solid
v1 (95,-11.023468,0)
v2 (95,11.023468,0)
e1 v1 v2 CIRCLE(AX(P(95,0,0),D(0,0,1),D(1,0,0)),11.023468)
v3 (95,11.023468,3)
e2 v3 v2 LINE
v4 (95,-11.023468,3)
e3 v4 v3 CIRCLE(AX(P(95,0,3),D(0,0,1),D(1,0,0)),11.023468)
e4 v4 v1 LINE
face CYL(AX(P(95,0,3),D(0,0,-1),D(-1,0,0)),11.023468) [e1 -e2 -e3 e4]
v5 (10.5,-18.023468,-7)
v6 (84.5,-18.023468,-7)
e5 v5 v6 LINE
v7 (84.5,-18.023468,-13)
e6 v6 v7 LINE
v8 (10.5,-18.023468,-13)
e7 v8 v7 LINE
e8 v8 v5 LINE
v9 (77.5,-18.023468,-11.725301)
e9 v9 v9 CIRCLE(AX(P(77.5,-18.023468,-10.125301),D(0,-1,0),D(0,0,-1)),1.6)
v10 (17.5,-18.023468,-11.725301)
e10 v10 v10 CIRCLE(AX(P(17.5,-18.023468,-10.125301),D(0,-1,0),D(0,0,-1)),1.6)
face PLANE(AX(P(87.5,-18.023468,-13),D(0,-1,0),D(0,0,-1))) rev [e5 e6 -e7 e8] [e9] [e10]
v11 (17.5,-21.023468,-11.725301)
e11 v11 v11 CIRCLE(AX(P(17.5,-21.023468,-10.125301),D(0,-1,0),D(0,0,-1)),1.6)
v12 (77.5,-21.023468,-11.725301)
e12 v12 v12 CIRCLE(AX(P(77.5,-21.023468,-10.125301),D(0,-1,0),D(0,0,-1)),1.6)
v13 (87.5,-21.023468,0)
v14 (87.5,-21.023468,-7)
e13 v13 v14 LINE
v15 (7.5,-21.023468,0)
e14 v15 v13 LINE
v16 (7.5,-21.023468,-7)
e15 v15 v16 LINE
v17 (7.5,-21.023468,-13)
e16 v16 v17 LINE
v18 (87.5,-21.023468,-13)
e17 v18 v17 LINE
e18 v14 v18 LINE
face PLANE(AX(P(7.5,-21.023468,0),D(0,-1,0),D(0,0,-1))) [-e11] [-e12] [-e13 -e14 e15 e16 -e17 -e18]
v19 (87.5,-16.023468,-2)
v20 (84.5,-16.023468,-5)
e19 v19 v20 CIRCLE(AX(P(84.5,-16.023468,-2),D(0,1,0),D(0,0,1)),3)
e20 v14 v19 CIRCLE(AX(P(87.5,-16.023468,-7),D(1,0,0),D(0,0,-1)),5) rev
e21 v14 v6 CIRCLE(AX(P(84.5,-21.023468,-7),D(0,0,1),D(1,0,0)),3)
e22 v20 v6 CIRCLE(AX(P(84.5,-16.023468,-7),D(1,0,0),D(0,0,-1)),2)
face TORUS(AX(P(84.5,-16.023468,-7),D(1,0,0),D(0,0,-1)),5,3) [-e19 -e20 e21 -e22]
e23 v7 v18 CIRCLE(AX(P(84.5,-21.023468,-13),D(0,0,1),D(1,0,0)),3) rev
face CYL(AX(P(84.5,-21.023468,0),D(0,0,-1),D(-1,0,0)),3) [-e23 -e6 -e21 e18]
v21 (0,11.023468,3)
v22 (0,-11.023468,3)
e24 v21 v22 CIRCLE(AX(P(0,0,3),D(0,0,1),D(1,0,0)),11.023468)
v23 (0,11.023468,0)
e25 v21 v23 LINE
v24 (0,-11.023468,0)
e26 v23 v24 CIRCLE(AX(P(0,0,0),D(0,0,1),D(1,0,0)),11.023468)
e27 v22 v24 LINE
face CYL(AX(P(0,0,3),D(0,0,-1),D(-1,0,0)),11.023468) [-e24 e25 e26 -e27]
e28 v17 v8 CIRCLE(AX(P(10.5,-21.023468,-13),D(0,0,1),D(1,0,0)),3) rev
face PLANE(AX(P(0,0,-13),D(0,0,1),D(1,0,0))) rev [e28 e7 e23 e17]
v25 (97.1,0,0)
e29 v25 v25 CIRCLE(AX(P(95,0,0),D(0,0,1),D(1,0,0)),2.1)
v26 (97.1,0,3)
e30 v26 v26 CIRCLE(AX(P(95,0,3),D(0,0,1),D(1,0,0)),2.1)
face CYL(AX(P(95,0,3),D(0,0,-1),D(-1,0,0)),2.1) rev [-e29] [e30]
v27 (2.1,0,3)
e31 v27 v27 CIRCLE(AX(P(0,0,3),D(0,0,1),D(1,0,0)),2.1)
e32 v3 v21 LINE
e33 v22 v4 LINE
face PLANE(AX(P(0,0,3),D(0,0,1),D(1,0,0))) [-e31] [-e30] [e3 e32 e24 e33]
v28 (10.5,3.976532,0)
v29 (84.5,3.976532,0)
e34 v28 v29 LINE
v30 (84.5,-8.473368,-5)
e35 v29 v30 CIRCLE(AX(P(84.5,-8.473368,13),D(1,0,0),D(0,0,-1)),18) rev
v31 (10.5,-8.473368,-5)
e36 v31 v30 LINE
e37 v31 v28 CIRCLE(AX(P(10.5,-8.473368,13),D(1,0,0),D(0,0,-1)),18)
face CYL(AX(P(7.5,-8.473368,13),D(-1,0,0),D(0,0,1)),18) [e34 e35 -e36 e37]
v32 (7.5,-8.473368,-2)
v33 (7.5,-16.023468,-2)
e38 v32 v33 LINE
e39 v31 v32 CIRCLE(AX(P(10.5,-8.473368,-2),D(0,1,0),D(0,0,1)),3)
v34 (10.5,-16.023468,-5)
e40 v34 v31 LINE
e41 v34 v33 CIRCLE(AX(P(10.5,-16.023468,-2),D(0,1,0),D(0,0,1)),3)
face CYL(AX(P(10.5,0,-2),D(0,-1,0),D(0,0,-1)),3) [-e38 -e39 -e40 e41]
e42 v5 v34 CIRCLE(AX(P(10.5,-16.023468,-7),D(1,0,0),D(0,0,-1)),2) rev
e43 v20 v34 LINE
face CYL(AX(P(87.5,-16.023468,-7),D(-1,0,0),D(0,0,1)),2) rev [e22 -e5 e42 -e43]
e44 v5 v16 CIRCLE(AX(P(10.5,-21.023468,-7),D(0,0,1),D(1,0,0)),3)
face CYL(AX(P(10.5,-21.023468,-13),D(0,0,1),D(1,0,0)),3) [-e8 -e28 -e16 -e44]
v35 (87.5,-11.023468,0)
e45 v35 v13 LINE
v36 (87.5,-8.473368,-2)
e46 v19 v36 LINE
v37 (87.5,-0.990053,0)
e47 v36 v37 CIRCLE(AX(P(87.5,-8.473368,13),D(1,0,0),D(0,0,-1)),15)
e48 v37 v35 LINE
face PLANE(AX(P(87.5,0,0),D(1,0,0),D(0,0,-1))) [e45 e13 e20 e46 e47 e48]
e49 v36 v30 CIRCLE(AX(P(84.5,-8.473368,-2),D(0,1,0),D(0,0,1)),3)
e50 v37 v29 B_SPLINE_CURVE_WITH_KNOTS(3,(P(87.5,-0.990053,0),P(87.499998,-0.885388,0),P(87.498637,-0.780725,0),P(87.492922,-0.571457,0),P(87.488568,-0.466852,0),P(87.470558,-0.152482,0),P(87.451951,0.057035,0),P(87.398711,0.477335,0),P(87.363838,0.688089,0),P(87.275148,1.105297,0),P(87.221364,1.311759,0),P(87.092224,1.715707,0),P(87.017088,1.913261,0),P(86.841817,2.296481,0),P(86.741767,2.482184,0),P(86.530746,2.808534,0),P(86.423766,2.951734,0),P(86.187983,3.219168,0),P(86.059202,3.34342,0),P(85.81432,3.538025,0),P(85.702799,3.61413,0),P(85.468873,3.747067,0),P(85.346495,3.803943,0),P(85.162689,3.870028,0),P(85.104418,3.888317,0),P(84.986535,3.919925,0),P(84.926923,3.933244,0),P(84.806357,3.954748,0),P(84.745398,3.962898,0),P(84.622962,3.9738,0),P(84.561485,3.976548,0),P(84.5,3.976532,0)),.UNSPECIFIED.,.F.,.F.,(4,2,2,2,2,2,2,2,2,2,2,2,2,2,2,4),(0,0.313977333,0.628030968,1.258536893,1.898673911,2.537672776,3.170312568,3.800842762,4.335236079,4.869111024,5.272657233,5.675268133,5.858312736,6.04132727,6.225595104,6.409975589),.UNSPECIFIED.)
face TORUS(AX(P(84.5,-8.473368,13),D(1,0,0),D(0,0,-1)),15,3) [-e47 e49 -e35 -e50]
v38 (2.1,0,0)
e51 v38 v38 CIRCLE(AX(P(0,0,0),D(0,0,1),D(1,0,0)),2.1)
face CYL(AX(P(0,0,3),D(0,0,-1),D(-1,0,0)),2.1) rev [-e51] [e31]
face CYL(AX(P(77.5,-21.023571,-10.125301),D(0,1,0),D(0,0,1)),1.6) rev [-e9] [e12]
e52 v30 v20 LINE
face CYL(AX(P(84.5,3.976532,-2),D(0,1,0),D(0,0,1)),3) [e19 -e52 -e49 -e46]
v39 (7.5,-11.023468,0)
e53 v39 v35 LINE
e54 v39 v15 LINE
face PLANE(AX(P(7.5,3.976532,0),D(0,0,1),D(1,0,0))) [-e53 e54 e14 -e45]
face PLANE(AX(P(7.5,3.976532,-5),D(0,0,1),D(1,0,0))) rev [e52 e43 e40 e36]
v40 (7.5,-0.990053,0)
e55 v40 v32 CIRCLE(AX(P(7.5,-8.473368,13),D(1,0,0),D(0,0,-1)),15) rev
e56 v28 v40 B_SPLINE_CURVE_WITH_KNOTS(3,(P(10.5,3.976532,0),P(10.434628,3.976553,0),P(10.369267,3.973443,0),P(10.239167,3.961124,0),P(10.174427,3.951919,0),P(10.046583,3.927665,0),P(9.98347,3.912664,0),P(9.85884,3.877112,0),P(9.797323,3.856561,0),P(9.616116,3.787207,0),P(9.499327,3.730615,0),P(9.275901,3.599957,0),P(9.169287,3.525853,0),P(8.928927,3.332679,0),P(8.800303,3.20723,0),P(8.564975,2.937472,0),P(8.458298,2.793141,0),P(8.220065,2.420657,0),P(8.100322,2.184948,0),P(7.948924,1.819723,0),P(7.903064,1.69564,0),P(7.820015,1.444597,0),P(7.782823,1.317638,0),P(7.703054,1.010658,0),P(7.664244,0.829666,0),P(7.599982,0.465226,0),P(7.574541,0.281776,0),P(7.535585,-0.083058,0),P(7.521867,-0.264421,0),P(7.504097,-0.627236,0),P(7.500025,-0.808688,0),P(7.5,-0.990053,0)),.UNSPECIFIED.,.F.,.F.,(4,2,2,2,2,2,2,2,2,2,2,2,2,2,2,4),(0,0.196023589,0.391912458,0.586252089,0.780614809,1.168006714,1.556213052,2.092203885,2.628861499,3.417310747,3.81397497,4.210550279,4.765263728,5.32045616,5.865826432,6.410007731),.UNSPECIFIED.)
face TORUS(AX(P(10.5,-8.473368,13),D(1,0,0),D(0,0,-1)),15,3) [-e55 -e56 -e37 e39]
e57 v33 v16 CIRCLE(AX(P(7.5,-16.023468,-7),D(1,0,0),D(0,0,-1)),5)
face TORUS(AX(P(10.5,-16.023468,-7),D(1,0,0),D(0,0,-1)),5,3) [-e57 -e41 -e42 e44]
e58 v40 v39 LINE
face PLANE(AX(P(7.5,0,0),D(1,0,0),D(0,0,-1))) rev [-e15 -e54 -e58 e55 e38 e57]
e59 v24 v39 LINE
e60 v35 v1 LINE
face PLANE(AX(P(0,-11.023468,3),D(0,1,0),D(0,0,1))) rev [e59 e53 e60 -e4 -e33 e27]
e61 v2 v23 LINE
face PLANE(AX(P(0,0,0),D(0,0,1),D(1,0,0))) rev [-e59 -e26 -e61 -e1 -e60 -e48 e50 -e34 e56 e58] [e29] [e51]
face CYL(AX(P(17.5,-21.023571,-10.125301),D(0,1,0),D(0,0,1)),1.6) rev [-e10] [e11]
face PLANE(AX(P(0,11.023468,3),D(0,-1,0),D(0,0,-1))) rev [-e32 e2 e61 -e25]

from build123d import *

# Parameters (mm, degrees)
SKETCH1_R               = 2.1
BOSS_EXTRUDE1_DEPTH     = 3
BOSS_EXTRUDE2_DEPTH     = 40
FILLET1_R               = 18
SKETCH2_W               = 80
SKETCH2_H               = 3
BOSS_EXTRUDE3_DEPTH     = 8
FILLET2_R               = 2
CUT_EXTRUDE1_DEPTH      = 111.696432989
CUT_EXTRUDE1_DEPTH_BACK = 111.696432989
SKETCH3_R               = 1.6
FILLET3_R               = 3


# Some blends are built 0.0001 mm under size
with BuildPart() as part:
    # Sketch1 → Boss-Extrude1 (new body)
    with BuildSketch(Plane.XY):
        with BuildLine():
            Line((0, 11.023468057), (95, 11.023468057))
            ThreePointArc((95, 11.023468057), (106.023468057, 0), (95, -11.023468057))
            Line((95, -11.023468057), (0, -11.023468057))
            ThreePointArc((0, -11.023468057), (-11.023468057, 0), (0, 11.023468057))
        make_face()
        Circle(SKETCH1_R, mode=Mode.SUBTRACT)
        with Locations((95, 0)):
            Circle(SKETCH1_R, mode=Mode.SUBTRACT)
    extrude(amount=BOSS_EXTRUDE1_DEPTH)

    # 3DSketch1 → Boss-Extrude2 (add, symmetric)
    with BuildSketch(Plane(origin=(47.5, 3.976531943, 0), x_dir=(0, -0.9805806756909202, -0.19611613513818404), z_dir=(-1, 0, 0))):
        Polygon((0, 0), (0.980580676, -4.902903378), (25.495097568, 0), (24.514516892, 4.902903378), align=None)
    extrude(amount=BOSS_EXTRUDE2_DEPTH, both=True)

    # Fillet1
    # the kernel refuses this fillet: 18 mm, written as the material it takes off along each edge
    with BuildSketch(Plane(origin=(118.624748995, 3.976531943, -5), x_dir=(0, 0, 1), z_dir=(-1, 0, 0))) as fillet1_piece_1:
        with BuildLine():
            CenterArc((18, -12.449899598), FILLET1_R, 136.238257307, 43.761742693)
            Line((0, -12.449899598), (-0.36, -12.449899598))
            Line((-0.36, -12.449899598), (-0.36, 0))
            Line((-0.36, 0), (0, 0.36))
            ThreePointArc((0, 0.36), (2.5, 0.36), (4.74, 0.248997992))
            Line((4.74, 0.248997992), (5, 0))
        make_face()
    extrude(amount=142.24949799, mode=Mode.SUBTRACT)

    # Sketch2 → Boss-Extrude3 (add)
    with BuildSketch(Plane(origin=(0, 0, -5), x_dir=(-1, 0, 0), z_dir=(0, 0, -1))):
        with Locations((-47.5, -19.523468057)):
            Rectangle(SKETCH2_W, SKETCH2_H)
    extrude(amount=BOSS_EXTRUDE3_DEPTH)

    # Fillet2
    fillet2_edges = [part.edges().sort_by_distance(p)[0] for p in [
        (47.5, -18.023468057, -5),
    ]]
    fillet(fillet2_edges, radius=FILLET2_R)

    # Sketch3 → Cut-Extrude1 (cut, two sides: drawn at the far end of the back side and taken through both)
    with BuildSketch(Plane(origin=(0, -18.023468057, 0), x_dir=(1, 0, 0), z_dir=(0, 1, 0)).offset(-CUT_EXTRUDE1_DEPTH_BACK)):
        with Locations(Location((17.5, 10.125300862, 0), (0, 0, 90))):
            Circle(SKETCH3_R)
        with Locations(Location((77.5, 10.125300862, 0), (0, 0, 90))):
            Circle(SKETCH3_R)
    extrude(amount=CUT_EXTRUDE1_DEPTH + CUT_EXTRUDE1_DEPTH_BACK, mode=Mode.SUBTRACT)

    # Fillet3
    fillet3_edges = [part.edges().sort_by_distance(p)[0] for p in [
        (7.5, -1.765163723, -3.703293088),
        (87.5, -1.765163723, -3.703293088),
        (7.5, -18.023468057, -10),
        (7.5, -17.43768162, -5.585786438),
        (87.5, -17.43768162, -5.585786438),
        (87.5, -18.023468057, -10),
        (87.5, -12.248417856, -5),
        (7.5, -12.248417856, -5),
    ]]
    fillet(fillet3_edges, radius=FILLET3_R - 0.0001)  # a hair under: the kernel refuses the full size


solid = part.part
